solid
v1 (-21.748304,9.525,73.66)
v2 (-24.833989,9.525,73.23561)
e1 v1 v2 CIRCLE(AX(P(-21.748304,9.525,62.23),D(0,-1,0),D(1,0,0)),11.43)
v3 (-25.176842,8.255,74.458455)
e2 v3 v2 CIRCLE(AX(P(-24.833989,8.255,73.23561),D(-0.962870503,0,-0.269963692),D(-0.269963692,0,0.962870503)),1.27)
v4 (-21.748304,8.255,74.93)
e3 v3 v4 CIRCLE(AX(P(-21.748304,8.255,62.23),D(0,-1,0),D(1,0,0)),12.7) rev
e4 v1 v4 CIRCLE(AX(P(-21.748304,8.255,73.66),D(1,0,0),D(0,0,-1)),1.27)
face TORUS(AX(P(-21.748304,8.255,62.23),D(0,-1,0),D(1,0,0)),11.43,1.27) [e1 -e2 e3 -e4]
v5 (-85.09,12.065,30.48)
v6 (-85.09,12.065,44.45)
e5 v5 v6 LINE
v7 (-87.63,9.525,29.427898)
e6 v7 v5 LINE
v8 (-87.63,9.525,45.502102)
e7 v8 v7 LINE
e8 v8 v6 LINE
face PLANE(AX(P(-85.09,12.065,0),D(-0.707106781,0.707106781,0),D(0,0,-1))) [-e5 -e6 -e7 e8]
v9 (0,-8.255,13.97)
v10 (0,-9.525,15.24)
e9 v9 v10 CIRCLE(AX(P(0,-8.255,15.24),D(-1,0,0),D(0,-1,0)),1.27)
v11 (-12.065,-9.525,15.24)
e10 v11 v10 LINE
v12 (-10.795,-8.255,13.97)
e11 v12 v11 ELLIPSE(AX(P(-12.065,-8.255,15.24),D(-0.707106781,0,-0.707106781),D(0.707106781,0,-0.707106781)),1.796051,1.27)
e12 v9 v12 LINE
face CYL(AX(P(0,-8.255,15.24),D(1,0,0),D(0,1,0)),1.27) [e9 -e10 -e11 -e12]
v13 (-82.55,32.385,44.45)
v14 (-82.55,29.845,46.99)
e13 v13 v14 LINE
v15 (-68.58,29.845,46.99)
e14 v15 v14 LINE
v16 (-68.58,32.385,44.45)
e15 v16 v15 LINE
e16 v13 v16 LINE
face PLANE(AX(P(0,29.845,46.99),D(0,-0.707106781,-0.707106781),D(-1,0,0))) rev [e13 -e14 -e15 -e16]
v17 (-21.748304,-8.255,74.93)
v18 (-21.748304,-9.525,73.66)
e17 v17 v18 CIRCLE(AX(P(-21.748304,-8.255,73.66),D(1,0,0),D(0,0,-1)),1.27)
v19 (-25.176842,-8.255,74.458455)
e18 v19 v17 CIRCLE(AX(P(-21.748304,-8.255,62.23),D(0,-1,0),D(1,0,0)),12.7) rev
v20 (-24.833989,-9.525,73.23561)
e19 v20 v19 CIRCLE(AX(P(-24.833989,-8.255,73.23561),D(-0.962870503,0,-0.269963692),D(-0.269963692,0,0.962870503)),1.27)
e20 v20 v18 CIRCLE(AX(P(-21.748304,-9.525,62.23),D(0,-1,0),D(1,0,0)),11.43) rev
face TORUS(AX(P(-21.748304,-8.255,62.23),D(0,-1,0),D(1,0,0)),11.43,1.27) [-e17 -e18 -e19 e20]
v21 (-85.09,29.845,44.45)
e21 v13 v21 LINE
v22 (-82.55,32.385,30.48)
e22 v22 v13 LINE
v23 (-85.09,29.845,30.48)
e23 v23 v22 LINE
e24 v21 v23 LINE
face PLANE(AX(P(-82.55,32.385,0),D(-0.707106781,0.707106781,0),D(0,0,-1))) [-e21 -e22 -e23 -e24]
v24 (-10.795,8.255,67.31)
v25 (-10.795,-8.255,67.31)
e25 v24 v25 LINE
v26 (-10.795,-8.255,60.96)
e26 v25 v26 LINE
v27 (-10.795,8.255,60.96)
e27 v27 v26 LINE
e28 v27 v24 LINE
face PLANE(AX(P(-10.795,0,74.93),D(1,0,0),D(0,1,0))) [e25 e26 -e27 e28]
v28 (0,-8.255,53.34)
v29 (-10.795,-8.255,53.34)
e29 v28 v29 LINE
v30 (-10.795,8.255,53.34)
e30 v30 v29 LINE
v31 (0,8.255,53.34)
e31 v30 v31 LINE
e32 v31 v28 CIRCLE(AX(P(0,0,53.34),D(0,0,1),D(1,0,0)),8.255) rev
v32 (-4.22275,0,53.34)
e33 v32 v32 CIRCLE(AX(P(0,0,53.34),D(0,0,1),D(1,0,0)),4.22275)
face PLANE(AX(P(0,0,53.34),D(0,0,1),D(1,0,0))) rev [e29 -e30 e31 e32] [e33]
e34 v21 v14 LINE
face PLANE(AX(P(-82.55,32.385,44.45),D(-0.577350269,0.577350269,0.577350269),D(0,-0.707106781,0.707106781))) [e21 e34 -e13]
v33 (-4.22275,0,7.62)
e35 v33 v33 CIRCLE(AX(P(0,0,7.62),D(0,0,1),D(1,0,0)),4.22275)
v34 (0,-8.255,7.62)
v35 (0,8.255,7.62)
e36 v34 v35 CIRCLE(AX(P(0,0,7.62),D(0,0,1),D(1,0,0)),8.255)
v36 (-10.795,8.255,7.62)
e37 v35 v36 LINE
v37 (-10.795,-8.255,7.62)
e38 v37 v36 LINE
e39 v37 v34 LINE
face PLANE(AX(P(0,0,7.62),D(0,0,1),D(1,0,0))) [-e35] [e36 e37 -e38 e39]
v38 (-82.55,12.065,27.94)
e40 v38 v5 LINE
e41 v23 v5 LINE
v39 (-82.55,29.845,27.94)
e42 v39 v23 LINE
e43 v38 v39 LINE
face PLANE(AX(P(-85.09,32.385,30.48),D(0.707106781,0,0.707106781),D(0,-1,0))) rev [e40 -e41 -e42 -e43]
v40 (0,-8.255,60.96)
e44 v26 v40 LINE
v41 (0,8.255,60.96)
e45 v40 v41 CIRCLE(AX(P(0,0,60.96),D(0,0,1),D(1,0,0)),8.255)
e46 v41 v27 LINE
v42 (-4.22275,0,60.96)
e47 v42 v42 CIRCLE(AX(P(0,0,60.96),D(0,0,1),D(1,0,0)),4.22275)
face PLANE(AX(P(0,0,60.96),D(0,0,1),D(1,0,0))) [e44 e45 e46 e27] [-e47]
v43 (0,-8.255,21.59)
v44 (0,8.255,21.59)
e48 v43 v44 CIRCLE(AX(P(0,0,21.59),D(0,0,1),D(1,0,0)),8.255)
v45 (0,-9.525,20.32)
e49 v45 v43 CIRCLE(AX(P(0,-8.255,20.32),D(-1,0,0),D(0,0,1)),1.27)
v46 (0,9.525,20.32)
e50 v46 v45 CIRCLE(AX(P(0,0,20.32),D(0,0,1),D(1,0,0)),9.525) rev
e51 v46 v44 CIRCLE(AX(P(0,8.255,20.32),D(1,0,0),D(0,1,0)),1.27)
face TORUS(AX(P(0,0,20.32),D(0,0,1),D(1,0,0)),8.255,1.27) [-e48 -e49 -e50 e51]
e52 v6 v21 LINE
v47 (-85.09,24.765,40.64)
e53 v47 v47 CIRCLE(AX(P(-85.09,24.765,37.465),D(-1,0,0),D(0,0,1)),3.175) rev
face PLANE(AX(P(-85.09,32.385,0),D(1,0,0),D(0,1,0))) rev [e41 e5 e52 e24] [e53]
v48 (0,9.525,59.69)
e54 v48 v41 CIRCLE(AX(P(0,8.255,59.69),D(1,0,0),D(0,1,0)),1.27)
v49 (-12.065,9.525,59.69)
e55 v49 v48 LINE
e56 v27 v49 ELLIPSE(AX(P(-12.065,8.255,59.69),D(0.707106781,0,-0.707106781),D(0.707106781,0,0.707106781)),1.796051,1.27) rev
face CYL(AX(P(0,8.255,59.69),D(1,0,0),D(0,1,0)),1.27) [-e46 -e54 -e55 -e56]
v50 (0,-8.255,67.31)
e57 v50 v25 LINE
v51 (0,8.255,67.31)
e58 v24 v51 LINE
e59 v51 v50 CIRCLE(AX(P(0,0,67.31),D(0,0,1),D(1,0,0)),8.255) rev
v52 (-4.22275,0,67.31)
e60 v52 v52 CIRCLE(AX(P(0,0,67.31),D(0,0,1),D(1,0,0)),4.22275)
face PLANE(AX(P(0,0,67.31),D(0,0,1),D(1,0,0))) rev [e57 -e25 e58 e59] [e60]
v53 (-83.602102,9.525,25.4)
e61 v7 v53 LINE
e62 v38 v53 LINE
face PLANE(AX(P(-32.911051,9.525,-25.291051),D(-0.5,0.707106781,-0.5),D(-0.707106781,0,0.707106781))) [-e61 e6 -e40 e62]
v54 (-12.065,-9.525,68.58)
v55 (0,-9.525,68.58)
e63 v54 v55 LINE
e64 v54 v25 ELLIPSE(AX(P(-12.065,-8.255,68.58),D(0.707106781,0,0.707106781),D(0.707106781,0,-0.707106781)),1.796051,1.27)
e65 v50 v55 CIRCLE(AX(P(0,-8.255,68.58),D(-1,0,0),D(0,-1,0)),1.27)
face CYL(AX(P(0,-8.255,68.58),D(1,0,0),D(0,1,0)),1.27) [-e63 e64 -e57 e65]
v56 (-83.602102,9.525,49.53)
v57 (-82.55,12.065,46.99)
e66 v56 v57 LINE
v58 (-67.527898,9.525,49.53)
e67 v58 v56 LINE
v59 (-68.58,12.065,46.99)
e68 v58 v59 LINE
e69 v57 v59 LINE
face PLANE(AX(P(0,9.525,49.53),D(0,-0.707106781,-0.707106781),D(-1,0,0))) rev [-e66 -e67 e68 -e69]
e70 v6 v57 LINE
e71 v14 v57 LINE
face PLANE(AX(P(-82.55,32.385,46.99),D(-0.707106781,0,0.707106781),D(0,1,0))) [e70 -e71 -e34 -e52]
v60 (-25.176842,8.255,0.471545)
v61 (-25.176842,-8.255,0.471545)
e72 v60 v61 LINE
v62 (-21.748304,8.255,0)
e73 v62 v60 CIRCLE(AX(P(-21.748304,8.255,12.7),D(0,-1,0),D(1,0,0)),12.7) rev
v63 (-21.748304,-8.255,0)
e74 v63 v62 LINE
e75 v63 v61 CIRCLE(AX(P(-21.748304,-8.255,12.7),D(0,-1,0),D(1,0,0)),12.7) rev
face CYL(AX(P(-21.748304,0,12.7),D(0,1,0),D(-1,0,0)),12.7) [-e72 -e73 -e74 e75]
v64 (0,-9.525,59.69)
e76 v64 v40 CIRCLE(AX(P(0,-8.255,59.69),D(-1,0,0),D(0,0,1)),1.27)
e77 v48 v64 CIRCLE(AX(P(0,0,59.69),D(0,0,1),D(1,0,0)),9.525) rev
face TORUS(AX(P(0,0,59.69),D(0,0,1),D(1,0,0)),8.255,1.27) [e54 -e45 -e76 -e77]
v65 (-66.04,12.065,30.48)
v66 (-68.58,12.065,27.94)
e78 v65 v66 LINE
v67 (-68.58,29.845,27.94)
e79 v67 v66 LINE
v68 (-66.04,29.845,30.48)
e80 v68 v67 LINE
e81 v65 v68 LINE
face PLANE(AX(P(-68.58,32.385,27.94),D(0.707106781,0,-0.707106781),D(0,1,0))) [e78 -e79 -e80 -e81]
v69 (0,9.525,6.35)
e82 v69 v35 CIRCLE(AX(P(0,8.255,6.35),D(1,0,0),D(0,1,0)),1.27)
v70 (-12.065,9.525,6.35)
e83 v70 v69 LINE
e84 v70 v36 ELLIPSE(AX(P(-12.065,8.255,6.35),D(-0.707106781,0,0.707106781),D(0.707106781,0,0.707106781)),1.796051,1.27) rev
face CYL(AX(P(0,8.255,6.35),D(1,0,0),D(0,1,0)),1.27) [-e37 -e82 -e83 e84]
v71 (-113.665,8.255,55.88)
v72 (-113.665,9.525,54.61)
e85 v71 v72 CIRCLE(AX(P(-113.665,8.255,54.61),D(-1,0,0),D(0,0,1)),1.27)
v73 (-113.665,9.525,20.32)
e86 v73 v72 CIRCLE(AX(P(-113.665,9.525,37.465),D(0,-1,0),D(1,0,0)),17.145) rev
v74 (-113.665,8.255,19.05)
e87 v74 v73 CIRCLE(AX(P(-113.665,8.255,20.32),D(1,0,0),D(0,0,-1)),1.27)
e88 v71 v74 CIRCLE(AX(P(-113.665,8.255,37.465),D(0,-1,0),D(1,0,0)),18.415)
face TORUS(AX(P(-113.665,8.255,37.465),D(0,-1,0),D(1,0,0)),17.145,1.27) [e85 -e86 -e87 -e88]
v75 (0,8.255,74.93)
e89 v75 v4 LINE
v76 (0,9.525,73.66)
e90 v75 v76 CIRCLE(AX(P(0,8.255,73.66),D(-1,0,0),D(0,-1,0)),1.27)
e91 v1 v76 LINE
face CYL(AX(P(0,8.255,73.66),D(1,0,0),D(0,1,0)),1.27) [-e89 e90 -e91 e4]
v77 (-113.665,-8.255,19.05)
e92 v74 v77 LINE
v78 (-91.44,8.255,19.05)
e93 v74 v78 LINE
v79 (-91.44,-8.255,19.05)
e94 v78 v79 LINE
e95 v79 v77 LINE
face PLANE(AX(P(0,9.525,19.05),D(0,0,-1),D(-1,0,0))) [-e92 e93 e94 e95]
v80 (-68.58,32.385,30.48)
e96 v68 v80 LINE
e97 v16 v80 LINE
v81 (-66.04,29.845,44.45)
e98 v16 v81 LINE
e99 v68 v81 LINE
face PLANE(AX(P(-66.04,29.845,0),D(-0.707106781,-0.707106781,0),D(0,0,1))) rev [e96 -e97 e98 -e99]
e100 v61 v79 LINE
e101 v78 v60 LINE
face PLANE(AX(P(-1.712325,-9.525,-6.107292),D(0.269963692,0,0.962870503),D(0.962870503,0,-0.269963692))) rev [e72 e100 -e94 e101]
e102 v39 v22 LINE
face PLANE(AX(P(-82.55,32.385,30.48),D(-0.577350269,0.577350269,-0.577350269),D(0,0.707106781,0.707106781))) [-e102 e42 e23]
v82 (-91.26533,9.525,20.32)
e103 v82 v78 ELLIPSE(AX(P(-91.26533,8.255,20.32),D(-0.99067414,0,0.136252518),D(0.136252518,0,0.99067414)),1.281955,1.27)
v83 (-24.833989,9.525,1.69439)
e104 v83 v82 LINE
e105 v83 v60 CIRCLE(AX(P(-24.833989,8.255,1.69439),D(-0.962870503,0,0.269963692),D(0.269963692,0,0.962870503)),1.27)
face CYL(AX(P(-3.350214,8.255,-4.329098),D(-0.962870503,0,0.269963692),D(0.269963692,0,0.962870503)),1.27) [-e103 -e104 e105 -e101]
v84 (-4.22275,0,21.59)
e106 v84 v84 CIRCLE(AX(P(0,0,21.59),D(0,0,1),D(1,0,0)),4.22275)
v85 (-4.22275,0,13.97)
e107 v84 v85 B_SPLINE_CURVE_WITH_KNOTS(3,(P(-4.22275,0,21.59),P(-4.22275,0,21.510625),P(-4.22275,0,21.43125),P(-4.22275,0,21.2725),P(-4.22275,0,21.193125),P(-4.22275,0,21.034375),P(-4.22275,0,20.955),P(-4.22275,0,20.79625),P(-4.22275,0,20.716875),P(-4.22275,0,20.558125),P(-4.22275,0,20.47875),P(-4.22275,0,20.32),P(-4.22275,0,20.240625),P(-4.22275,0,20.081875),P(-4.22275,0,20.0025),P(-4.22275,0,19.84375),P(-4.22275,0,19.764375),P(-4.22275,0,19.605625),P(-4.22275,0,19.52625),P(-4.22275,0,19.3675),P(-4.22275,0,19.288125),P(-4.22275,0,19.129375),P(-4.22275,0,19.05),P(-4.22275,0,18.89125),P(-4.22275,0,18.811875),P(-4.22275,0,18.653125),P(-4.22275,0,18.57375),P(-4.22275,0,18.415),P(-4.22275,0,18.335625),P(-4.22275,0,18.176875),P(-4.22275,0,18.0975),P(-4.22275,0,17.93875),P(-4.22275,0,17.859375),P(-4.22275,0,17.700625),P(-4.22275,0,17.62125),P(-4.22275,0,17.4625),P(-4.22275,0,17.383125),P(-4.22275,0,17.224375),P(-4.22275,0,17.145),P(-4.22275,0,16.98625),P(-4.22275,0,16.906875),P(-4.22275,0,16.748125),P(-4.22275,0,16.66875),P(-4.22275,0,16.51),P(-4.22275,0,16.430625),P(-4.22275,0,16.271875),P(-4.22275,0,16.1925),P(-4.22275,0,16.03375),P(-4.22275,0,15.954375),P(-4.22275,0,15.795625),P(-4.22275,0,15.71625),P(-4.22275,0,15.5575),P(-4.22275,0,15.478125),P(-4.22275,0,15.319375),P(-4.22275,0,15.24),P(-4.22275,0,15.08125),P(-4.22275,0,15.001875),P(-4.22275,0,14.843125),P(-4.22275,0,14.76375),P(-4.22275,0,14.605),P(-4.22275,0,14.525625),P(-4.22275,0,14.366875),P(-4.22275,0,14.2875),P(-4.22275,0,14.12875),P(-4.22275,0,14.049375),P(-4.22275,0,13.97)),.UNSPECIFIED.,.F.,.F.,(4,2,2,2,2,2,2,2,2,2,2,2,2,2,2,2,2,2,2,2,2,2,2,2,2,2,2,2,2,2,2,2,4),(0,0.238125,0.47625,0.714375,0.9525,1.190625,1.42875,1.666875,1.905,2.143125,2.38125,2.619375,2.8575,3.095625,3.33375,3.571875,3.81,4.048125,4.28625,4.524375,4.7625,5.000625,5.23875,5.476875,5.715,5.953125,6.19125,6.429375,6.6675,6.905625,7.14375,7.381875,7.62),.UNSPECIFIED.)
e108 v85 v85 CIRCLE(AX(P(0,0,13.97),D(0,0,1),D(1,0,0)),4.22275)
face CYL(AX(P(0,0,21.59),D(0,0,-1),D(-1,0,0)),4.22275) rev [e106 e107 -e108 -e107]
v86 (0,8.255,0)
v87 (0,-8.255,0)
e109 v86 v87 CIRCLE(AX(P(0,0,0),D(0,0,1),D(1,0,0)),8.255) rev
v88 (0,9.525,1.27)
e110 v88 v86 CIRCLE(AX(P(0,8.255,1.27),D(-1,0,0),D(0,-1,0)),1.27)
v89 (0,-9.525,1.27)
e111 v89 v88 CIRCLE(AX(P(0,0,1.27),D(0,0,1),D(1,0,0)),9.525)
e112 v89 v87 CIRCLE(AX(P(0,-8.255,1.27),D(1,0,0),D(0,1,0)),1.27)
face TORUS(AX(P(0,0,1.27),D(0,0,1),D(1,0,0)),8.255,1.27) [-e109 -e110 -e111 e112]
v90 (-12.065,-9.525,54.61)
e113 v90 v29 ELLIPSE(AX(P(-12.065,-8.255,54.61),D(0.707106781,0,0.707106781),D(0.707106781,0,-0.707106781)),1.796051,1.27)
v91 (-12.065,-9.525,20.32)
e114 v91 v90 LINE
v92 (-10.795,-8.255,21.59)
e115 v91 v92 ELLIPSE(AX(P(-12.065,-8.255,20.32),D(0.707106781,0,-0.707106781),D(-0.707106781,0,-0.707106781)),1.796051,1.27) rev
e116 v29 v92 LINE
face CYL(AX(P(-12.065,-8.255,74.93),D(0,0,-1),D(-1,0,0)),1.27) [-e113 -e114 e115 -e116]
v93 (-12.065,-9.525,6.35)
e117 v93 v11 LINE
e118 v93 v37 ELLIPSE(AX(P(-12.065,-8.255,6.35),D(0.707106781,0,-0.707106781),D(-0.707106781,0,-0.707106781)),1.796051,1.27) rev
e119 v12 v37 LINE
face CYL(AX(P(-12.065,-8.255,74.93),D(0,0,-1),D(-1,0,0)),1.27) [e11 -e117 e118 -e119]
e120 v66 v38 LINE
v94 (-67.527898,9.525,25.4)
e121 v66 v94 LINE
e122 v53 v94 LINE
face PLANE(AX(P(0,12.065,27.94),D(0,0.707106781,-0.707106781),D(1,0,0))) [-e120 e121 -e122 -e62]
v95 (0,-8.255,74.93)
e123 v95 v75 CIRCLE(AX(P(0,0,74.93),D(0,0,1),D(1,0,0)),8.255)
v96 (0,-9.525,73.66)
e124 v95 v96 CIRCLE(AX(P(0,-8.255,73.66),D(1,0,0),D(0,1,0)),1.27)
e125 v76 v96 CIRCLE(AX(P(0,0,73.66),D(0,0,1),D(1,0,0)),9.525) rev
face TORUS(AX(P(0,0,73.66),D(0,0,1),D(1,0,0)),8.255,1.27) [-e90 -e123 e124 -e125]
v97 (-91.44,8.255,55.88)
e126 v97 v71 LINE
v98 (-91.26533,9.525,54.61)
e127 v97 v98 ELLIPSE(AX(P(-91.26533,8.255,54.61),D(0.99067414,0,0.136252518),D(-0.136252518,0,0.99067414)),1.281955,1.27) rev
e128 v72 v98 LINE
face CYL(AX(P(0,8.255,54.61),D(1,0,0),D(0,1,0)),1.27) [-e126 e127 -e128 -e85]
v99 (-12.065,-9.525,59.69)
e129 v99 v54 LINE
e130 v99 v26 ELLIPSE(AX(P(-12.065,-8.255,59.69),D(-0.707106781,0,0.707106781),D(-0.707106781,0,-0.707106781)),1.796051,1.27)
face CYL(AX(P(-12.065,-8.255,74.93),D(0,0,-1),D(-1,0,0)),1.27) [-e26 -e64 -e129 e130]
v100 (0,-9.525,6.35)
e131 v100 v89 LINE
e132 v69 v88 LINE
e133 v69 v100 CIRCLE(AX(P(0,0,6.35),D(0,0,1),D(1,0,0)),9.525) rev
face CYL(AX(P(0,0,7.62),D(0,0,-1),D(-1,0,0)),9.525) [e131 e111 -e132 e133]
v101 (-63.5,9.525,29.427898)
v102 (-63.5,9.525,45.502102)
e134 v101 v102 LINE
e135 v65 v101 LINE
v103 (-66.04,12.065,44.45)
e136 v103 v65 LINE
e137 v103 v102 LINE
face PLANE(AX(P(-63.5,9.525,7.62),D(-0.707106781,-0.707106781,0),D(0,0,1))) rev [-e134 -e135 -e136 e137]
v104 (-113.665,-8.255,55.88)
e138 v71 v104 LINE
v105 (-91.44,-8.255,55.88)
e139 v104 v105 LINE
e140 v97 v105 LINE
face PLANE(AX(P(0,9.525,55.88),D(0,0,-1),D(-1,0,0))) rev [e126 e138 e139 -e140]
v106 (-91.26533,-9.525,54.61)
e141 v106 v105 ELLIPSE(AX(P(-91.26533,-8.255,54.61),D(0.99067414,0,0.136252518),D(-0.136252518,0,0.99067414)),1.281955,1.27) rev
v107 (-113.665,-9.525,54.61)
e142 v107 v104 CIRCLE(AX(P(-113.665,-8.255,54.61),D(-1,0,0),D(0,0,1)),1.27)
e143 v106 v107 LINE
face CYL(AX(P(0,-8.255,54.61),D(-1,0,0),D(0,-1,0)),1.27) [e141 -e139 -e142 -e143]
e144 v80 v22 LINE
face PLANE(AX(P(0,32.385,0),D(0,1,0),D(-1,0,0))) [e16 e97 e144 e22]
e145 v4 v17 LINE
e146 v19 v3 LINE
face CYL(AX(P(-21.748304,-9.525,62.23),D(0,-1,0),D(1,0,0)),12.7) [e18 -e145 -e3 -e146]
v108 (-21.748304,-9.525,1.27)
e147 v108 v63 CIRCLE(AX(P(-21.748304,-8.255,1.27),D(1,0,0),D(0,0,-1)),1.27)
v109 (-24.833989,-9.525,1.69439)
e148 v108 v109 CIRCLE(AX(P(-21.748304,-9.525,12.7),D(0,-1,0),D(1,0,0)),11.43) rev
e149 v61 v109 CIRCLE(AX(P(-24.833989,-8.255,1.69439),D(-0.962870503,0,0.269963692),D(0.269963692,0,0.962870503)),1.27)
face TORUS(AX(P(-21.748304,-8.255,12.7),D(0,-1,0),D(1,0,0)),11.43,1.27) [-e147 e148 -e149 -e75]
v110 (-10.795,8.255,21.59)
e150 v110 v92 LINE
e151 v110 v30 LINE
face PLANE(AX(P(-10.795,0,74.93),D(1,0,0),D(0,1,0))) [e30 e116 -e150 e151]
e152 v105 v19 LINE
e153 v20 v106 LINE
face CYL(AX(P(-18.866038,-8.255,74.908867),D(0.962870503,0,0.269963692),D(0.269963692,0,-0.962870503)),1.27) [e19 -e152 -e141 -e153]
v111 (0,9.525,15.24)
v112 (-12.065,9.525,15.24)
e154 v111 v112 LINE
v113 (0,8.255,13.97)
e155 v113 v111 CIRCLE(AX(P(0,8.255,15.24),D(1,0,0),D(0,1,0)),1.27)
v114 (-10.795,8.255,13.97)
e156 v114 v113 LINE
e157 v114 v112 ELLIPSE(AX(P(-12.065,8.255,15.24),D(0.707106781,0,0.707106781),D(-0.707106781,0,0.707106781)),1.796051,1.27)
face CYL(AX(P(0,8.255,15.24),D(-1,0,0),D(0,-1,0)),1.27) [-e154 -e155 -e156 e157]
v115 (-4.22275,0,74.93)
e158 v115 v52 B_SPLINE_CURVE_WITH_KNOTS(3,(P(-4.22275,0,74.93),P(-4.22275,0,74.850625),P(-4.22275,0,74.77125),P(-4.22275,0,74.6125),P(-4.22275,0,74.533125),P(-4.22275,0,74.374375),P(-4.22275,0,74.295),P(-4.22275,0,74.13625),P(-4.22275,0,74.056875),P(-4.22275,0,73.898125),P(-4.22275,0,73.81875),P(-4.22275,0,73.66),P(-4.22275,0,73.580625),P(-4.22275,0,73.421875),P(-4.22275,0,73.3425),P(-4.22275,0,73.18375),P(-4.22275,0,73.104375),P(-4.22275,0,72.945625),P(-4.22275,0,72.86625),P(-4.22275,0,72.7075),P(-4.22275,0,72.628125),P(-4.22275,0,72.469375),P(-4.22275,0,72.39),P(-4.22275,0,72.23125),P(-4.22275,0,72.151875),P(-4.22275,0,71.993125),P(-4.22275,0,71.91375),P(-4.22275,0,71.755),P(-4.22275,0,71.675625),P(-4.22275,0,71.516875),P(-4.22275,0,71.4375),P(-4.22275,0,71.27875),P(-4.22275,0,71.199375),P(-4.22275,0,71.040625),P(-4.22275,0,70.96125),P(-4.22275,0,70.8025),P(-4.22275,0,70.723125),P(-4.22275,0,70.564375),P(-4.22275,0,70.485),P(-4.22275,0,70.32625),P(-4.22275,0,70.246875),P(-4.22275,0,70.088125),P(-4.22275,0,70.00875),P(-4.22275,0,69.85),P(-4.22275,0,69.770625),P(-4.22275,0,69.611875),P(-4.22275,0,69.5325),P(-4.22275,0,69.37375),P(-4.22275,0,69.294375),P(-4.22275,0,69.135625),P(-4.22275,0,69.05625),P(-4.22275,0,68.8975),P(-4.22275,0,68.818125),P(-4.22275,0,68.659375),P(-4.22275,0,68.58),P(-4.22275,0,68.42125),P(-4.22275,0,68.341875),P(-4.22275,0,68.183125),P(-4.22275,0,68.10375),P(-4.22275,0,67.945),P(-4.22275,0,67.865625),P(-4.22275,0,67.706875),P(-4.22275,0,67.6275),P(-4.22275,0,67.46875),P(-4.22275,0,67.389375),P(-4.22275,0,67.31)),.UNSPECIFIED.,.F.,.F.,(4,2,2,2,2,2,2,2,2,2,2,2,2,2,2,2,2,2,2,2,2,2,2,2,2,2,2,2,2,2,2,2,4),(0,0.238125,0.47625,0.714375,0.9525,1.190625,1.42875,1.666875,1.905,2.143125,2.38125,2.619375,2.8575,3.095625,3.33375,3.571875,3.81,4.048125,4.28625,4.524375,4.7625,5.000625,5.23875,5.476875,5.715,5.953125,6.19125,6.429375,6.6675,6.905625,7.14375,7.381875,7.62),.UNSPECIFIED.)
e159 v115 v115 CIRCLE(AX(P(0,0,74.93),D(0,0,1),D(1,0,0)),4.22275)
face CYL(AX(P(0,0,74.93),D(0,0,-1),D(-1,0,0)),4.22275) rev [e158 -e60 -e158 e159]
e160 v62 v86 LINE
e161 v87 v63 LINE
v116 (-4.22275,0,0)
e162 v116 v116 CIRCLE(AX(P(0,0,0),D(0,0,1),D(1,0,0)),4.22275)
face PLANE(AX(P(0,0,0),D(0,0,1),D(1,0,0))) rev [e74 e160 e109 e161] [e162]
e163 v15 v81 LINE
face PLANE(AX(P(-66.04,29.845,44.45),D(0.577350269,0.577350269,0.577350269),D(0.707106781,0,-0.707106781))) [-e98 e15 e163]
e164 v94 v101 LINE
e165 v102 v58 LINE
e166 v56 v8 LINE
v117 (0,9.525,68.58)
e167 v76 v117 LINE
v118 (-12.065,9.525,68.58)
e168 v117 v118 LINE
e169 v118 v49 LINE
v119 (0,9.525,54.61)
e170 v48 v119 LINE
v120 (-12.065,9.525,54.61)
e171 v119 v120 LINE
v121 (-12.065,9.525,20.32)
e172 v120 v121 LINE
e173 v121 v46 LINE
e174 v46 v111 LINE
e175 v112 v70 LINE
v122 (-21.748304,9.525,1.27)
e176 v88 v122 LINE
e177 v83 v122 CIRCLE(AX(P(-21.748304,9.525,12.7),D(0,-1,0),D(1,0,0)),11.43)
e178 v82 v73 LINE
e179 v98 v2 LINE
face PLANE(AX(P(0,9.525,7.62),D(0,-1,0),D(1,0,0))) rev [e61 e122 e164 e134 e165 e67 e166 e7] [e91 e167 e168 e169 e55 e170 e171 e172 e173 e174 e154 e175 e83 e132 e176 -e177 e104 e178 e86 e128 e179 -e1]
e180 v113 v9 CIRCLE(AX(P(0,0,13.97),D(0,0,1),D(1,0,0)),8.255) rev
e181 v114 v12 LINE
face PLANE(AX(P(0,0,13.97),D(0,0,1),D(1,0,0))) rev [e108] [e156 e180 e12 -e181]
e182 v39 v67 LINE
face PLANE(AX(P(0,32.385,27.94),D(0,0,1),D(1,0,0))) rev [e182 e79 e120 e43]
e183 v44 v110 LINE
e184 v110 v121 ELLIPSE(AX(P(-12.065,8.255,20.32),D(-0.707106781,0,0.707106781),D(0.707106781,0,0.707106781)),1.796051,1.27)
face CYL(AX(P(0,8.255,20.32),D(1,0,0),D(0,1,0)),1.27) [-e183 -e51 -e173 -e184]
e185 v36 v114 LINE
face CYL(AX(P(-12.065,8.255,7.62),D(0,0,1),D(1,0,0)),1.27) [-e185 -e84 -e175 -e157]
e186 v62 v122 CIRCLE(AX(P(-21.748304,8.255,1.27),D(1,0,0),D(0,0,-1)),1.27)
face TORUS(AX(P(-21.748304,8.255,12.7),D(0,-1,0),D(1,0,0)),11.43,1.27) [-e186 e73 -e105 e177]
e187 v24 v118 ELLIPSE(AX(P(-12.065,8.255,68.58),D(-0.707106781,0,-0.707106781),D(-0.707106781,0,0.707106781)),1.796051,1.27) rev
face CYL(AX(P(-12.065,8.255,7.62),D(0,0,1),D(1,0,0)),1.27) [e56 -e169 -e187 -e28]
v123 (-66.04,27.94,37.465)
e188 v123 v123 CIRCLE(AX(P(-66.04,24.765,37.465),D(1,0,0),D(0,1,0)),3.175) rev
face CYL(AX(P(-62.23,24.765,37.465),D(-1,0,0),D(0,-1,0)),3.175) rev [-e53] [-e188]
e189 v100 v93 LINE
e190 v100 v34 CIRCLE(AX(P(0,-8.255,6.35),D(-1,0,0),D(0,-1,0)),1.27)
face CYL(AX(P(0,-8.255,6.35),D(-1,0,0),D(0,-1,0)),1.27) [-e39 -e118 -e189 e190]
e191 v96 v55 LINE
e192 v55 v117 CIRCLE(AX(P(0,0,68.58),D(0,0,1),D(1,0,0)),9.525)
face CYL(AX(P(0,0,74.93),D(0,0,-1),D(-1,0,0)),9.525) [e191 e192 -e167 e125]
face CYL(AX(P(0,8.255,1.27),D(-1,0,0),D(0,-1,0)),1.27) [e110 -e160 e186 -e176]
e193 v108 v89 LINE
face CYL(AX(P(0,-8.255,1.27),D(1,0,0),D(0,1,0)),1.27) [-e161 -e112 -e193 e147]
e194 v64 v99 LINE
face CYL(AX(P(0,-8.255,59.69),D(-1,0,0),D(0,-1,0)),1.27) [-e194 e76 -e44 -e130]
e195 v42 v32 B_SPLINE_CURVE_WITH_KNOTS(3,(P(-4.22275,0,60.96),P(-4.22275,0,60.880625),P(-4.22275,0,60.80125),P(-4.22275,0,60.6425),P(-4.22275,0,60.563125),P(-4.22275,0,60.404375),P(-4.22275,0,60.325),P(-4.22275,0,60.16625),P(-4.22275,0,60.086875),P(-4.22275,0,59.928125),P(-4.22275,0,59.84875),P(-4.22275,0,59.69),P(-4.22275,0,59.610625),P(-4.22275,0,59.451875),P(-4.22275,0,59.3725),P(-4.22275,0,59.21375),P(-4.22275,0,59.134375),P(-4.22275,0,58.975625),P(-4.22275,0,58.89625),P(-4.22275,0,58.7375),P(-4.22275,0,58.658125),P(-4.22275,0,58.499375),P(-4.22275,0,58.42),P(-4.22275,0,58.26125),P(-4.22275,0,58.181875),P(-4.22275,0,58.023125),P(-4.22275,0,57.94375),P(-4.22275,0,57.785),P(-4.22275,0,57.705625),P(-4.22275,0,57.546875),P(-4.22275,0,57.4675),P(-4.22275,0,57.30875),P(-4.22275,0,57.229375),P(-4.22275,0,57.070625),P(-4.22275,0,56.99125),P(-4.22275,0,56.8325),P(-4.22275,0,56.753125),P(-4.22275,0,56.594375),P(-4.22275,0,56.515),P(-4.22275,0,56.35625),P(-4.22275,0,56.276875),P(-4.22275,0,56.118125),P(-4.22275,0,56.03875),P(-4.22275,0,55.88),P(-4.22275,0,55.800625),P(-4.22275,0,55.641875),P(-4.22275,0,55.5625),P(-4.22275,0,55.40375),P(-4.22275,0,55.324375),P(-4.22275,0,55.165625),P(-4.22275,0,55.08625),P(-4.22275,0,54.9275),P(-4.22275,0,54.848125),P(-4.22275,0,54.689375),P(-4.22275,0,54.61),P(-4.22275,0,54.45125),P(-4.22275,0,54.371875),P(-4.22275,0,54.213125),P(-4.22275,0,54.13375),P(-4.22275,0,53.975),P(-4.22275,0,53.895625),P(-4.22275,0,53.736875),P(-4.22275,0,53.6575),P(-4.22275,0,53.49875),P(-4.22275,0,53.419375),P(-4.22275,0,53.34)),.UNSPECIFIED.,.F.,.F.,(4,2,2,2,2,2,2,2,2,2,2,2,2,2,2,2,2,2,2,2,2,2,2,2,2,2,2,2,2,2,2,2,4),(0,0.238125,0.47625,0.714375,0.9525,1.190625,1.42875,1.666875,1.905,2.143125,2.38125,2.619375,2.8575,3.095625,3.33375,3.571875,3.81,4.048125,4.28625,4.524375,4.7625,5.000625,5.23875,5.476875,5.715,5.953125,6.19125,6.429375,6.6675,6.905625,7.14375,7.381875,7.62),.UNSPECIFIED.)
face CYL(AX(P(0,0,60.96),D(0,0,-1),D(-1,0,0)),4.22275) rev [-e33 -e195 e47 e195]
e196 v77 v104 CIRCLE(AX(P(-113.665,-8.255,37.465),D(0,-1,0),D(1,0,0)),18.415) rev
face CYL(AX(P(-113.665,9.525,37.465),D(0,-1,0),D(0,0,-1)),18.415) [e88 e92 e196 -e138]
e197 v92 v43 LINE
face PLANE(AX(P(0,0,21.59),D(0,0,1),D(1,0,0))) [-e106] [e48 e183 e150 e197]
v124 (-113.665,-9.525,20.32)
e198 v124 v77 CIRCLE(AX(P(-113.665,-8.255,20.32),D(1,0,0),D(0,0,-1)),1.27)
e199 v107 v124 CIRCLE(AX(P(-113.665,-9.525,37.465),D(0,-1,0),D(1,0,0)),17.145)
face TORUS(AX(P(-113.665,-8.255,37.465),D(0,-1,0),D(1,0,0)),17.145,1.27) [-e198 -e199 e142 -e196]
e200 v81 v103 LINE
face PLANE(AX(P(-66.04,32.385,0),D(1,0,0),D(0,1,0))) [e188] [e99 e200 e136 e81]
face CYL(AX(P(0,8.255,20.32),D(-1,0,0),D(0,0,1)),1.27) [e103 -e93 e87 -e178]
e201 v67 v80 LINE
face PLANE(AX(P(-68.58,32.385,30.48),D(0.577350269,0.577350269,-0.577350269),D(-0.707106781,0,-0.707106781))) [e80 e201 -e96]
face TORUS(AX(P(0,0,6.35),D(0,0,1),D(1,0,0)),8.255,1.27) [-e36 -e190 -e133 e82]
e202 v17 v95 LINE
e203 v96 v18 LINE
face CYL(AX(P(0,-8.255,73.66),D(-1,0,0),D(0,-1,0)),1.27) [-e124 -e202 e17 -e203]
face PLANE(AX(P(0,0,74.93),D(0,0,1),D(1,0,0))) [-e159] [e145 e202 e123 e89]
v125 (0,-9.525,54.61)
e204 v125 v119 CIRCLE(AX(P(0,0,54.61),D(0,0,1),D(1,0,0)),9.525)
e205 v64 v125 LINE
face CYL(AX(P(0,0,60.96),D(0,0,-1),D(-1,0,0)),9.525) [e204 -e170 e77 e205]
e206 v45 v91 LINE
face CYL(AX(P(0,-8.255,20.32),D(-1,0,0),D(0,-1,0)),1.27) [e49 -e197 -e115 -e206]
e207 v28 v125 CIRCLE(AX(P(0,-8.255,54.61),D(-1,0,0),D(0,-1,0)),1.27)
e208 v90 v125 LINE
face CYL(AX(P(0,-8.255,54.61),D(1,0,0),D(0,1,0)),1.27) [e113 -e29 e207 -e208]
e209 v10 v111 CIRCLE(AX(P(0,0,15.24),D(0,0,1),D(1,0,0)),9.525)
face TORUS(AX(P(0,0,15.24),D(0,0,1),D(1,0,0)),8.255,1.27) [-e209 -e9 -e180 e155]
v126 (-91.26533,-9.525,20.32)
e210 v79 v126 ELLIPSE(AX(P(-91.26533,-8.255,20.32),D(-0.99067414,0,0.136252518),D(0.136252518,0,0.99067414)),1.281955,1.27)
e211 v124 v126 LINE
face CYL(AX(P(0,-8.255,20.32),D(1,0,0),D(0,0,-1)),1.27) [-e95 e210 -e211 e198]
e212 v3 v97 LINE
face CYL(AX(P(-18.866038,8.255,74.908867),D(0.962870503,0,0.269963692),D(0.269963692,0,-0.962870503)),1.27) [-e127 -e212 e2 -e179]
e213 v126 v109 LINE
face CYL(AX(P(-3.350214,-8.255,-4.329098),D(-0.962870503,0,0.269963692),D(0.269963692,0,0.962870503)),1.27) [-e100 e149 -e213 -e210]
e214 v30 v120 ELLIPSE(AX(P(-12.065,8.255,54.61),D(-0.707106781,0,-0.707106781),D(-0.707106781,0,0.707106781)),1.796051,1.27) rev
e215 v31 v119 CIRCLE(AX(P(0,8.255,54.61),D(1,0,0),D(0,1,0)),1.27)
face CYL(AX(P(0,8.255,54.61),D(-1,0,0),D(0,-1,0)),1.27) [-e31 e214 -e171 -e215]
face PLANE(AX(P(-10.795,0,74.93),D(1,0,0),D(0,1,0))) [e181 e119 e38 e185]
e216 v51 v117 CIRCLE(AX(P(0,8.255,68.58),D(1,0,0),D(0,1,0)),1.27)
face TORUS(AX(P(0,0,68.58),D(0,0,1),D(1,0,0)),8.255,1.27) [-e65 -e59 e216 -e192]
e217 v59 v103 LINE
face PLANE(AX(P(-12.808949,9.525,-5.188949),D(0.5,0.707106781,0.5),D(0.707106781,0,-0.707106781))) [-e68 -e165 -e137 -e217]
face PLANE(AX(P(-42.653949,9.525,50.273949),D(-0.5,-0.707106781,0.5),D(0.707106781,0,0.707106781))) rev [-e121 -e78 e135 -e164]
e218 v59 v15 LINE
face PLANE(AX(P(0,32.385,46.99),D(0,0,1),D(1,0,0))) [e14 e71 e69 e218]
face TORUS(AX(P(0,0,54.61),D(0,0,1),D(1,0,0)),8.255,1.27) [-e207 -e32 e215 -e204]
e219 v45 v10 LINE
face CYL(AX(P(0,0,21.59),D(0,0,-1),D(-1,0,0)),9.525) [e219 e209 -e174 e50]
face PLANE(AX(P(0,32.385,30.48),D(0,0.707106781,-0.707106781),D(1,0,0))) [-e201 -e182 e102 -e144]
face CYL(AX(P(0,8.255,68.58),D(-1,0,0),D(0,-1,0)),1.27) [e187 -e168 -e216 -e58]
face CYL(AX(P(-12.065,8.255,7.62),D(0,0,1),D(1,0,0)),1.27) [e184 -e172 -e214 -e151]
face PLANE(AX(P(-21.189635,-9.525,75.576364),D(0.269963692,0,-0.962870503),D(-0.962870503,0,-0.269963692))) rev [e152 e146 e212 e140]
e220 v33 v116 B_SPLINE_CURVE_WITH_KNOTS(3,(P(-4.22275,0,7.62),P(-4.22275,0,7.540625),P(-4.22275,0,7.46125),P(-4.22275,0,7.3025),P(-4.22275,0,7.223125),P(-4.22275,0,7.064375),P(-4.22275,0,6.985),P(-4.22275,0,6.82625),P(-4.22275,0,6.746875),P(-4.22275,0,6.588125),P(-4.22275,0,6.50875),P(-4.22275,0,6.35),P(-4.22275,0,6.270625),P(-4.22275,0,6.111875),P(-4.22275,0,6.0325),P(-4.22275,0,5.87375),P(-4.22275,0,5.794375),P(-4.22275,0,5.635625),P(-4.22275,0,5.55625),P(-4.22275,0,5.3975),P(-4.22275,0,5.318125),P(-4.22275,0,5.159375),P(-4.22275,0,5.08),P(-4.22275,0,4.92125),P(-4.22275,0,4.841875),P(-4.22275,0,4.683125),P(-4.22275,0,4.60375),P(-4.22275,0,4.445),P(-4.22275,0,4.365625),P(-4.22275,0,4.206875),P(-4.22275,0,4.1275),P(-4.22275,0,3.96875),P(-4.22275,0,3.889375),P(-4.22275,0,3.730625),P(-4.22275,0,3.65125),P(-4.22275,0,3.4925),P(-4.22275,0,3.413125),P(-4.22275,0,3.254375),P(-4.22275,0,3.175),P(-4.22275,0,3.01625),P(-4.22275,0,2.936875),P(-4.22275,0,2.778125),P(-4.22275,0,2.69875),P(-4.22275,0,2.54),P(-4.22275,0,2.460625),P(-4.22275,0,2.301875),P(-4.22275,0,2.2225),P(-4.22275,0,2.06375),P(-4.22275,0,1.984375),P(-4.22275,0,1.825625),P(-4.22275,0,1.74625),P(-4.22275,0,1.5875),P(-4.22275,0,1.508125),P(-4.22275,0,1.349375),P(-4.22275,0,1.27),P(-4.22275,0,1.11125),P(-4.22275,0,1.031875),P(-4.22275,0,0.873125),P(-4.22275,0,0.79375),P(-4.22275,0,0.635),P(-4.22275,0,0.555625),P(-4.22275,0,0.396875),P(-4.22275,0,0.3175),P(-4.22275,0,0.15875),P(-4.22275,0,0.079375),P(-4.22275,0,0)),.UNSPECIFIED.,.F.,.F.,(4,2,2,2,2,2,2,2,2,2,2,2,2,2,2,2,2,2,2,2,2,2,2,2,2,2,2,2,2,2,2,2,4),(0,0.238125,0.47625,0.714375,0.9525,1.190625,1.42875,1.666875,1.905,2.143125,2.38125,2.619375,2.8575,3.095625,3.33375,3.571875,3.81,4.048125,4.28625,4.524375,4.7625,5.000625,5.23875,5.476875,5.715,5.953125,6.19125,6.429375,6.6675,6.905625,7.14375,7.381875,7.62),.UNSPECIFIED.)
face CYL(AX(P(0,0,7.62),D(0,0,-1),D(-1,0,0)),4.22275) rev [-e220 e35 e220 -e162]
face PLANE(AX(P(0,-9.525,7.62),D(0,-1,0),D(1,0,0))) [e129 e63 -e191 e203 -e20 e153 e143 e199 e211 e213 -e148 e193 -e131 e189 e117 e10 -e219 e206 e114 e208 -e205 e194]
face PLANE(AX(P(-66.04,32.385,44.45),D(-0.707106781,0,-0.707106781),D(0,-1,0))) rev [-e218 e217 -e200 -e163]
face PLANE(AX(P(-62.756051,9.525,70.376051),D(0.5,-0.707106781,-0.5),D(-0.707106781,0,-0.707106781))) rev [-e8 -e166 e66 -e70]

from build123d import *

# Parameters (mm, degrees)
SKETCH2_R                      = 4.22275
INITIAL_GROOVE_DEPTH           = 7.62
GROOVE_LINEAR_PATTERN_COUNT    = 2
GROOVE_LINEAR_PATTERN_PITCH    = 13.97
LPATTERN2_COUNT                = 2
LPATTERN2_PITCH                = 39.37
LPATTERN3_COUNT                = 2
LPATTERN3_PITCH                = 13.97
SKETCH2_5_W                    = 30.48
SKETCH2_5_H                    = 9.525
MAIN_BODY_EXTRUDE_DEPTH        = 74.93
BOSS_EXTRUDE1_DEPTH            = 9.525
BOSS_EXTRUDE1_DEPTH_BACK       = 9.525
SKETCH7_W                      = 19.05
SKETCH7_H                      = 19.05
ANKLE_CONNECTION_EXTRUDE_DEPTH = 22.86
SKETCH8_R                      = 3.175
PINHOLE_2_DEPTH                = 22.86
CUT_EXTRUDE1_DEPTH             = 154.565005454
CUT_EXTRUDE1_DEPTH_BACK        = 154.565005454
FILLET6_R                      = 1.27
FILLET1_R                      = 1.27
CHAMFER2_SIZE                  = 2.54
FILLET8_R                      = 12.7
CHAMFER3_SIZE                  = 2.54


with BuildPart() as part:
    # Sketch2 → Initial Groove (new body)
    with BuildSketch(Plane.XY):
        with BuildLine():
            Line((-41.275, -9.525), (0, -9.525))
            ThreePointArc((0, -9.525), (9.525, 0), (0, 9.525))
            Line((0, 9.525), (-41.275, 9.525))
            Line((-41.275, 9.525), (-41.275, -9.525))
        make_face()
        with Locations(Location((0, 0, 0), (0, 0, 180))):
            Circle(SKETCH2_R, mode=Mode.SUBTRACT)
    extrude(amount=INITIAL_GROOVE_DEPTH)


with BuildPart() as groove_linear_pattern_1:
    # Groove Linear Pattern: pattern copy
    add(part.part.moved(Location(Vector(0, 0, 1) * (1 * GROOVE_LINEAR_PATTERN_PITCH))))


with BuildPart() as lpattern2_1:
    # LPattern2: pattern copy
    add(groove_linear_pattern_1.part.moved(Location(Vector(0, 0, 1) * (1 * LPATTERN2_PITCH))))


with BuildPart() as lpattern3_1:
    # LPattern3: pattern copy
    add(lpattern2_1.part.moved(Location(Vector(0, 0, 1) * (1 * LPATTERN3_PITCH))))


with BuildPart() as part_1:
    add(part.part)

    add(groove_linear_pattern_1.part)  # Main Body Extrude merges Groove Linear Pattern_1

    add(lpattern2_1.part)  # Main Body Extrude merges LPattern2_1

    add(lpattern3_1.part)  # Main Body Extrude merges LPattern3_1
    # Sketch2<5> → Main Body Extrude (add)
    with BuildSketch(Plane.XY):
        Polygon((-91.44, -9.525), (-41.275, -9.525), (-41.275, 0), (-41.275, 9.525), (-91.44, 9.525), align=None)
        with Locations((-26.035, -4.7625)):
            Rectangle(SKETCH2_5_W, SKETCH2_5_H)
        with Locations((-26.035, 4.7625)):
            Rectangle(SKETCH2_5_W, SKETCH2_5_H)
    extrude(amount=MAIN_BODY_EXTRUDE_DEPTH)

    # Sketch10 → Boss-Extrude1 (add, two sides: drawn at the far end of the back side and taken through both)
    with BuildSketch(Plane(origin=(0, 0, 0), x_dir=(1, 0, 0), z_dir=(0, 1, 0)).offset(-BOSS_EXTRUDE1_DEPTH_BACK)):
        with BuildLine():
            Line((-91.44, -55.88), (-91.44, -19.05))
            Line((-91.44, -19.05), (-113.665, -19.05))
            ThreePointArc((-113.665, -19.05), (-132.08, -37.465), (-113.665, -55.88))
            Line((-113.665, -55.88), (-91.44, -55.88))
        make_face()
    extrude(amount=BOSS_EXTRUDE1_DEPTH + BOSS_EXTRUDE1_DEPTH_BACK)

    # Sketch7 → Ankle Connection Extrude (add)
    with BuildSketch(Plane(origin=(0, 9.525, 0), x_dir=(1, 0, 0), z_dir=(0, 1, 0))):
        with Locations((-75.565, -37.465)):
            Rectangle(SKETCH7_W, SKETCH7_H)
    extrude(amount=ANKLE_CONNECTION_EXTRUDE_DEPTH)

    # Sketch8 → Pinhole 2 (cut)
    with BuildSketch(Plane(origin=(-85.09, 0, -38.1), x_dir=(0, 0, -1), z_dir=(1, 0, 0))):
        with Locations(Location((-75.565, 24.765, 0), (0, 0, 180))):
            Circle(SKETCH8_R)
    extrude(amount=PINHOLE_2_DEPTH, mode=Mode.SUBTRACT)

    # Sketch13 → Cut-Extrude1 (cut, two sides: drawn at the far end of the back side and taken through both)
    with BuildSketch(Plane(origin=(0, 9.525, 0), x_dir=(1, 0, 0), z_dir=(0, 1, 0)).offset(-CUT_EXTRUDE1_DEPTH_BACK)):
        Polygon((-91.44, -74.93), (-23.495, -74.93), (-91.44, -55.88), align=None)
        Polygon((-91.44, 0), (-91.44, -19.05), (-23.495, 0), align=None)
    extrude(amount=CUT_EXTRUDE1_DEPTH + CUT_EXTRUDE1_DEPTH_BACK, mode=Mode.SUBTRACT)

    # Fillet6
    fillet6_edges = [part_1.edges().sort_by_distance(p)[0] for p in [
        (-102.5525, 9.525, 19.05),
        (-132.08, -9.525, 37.465),
        (-102.5525, -9.525, 55.88),
        (-132.08, 9.525, 37.465),
        (-102.5525, 9.525, 55.88),
        (-102.5525, -9.525, 19.05),
    ]]
    fillet(fillet6_edges, radius=FILLET6_R)

    # Fillet1
    fillet1_edges = [part_1.edges().sort_by_distance(p)[0] for p in [
        (9.525, 0, 7.62),
        (-59.732333333, 9.525, 64.77),
        (-59.732333333, -9.525, 64.77),
        (-59.732333333, 9.525, 10.16),
        (-59.732333333, -9.525, 10.16),
        (-5.3975, 9.525, 7.62),
        (-11.7475, -9.525, 74.93),
        (-11.7475, 9.525, 74.93),
        (-10.795, -9.525, 10.795),
        (-10.795, 9.525, 10.795),
        (-5.3975, -9.525, 21.59),
        (9.525, 0, 13.97),
        (-5.3975, 9.525, 13.97),
        (-5.3975, 9.525, 21.59),
        (9.525, 0, 21.59),
        (-5.3975, -9.525, 13.97),
        (-5.3975, -9.525, 7.62),
        (-10.795, 9.525, 37.465),
        (-10.795, -9.525, 37.465),
        (-5.3975, -9.525, 60.96),
        (9.525, 0, 53.34),
        (-5.3975, 9.525, 53.34),
        (-5.3975, 9.525, 60.96),
        (9.525, 0, 60.96),
        (-5.3975, -9.525, 53.34),
        (-11.7475, 9.525, 0),
        (-10.795, 9.525, 64.135),
        (-10.795, -9.525, 64.135),
        (9.525, 0, 67.31),
        (9.525, 0, 0),
        (-5.3975, 9.525, 67.31),
        (9.525, 0, 74.93),
        (-5.3975, -9.525, 67.31),
        (-11.7475, -9.525, 0),
    ]]
    fillet(fillet1_edges, radius=FILLET1_R)

    # Chamfer2
    chamfer2_edges = [part_1.edges().sort_by_distance(p)[0] for p in [
        (-66.04, 20.955, 27.94),
        (-85.09, 20.955, 27.94),
        (-75.565, 32.385, 46.99),
        (-85.09, 20.955, 46.99),
        (-66.04, 32.385, 37.465),
        (-66.04, 20.955, 46.99),
        (-75.565, 32.385, 27.94),
        (-85.09, 32.385, 37.465),
    ]]
    chamfer(chamfer2_edges, length=CHAMFER2_SIZE)

    # Fillet8
    # the kernel refuses this fillet: 12.7 mm, written as the material it takes off along each edge
    with BuildSketch(Plane(origin=(-21.748303574, -9.525, 62.23), x_dir=(0, 0, 1), z_dir=(1, 0, 0))) as fillet8_piece_1:
        with BuildLine():
            CenterArc((11.43, -1.27), 1.27, 0, 90)
            Line((12.7, -1.27), (12.7, 0))
            Line((12.7, 0), (11.43, 0))
        make_face()
    revolve(axis=Axis((-21.748303574, -9.525, 62.23), (0, -1, 0)), revolution_arc=15.662106345, mode=Mode.SUBTRACT)
    with BuildSketch(Plane(origin=(-21.748303574, 9.525, 62.23), x_dir=(-0.269963692324909, 0, 0.96287050262551), z_dir=(-0.96287050262551, 0, -0.269963692324909))) as fillet8_piece_2:
        with BuildLine():
            CenterArc((11.43, -1.27), 1.27, 0, 90)
            Line((12.7, -1.27), (12.7, 0))
            Line((12.7, 0), (11.43, 0))
        make_face()
    revolve(axis=Axis((-21.748303574, 9.525, 62.23), (0, 1, 0)), revolution_arc=15.662106345, mode=Mode.SUBTRACT)
    with BuildSketch(Plane(origin=(-21.748303574, -9.525, 12.7), x_dir=(-0.2699636923249093, 0, -0.9628705026255098), z_dir=(-0.9628705026255098, 0, 0.2699636923249093))) as fillet8_piece_3:
        with BuildLine():
            CenterArc((11.43, -1.27), 1.27, 0, 90)
            Line((12.7, -1.27), (12.7, 0))
            Line((12.7, 0), (11.43, 0))
        make_face()
    revolve(axis=Axis((-21.748303574, -9.525, 12.7), (0, -1, 0)), revolution_arc=15.662106345, mode=Mode.SUBTRACT)
    with BuildSketch(Plane(origin=(-21.748303574, 9.525, 12.7), x_dir=(0, 0, -1), z_dir=(1, 0, 0))) as fillet8_piece_4:
        with BuildLine():
            CenterArc((11.43, -1.27), 1.27, 0, 90)
            Line((12.7, -1.27), (12.7, 0))
            Line((12.7, 0), (11.43, 0))
        make_face()
    revolve(axis=Axis((-21.748303574, 9.525, 12.7), (0, 1, 0)), revolution_arc=15.662106345, mode=Mode.SUBTRACT)
    with BuildSketch(Plane(origin=(-23.495, -9.525, 74.93), x_dir=(1, 0, 0), z_dir=(0, 1, 0))) as fillet8_piece_5:
        with BuildLine():
            CenterArc((FILLET8_R * 0.137535151689, FILLET8_R), FILLET8_R, 254.337893655, 15.662106345)
            Line((-FILLET8_R * 0.132428540636, FILLET8_R * 0.0371294973745), (0, 0))
            Line((0, 0), (FILLET8_R * 0.137535151689, 0))
        make_face()
    extrude(amount=19.05, mode=Mode.SUBTRACT)
    with BuildSketch(Plane(origin=(-23.495, 9.525, 0), x_dir=(-0.96287050262551, 0, 0.26996369232490863), z_dir=(0, -1, 0))) as fillet8_piece_6:
        with BuildLine():
            CenterArc((FILLET8_R * 0.137535151689, -FILLET8_R), FILLET8_R, 90, 15.662106345)
            Line((-FILLET8_R * 0.132428540636, -FILLET8_R * 0.0371294973745), (0, 0))
            Line((0, 0), (FILLET8_R * 0.137535151689, 0))
        make_face()
    extrude(amount=19.05, mode=Mode.SUBTRACT)

    # Chamfer3
    chamfer3_edges = [part_1.edges().sort_by_distance(p)[0] for p in [
        (-66.04, 9.525, 37.465),
        (-75.565, 9.525, 27.94),
        (-85.09, 9.525, 37.465),
        (-75.565, 9.525, 46.99),
        (-67.31, 9.525, 29.21),
        (-83.82, 9.525, 29.21),
        (-83.82, 9.525, 45.72),
        (-67.31, 9.525, 45.72),
    ]]
    chamfer(chamfer3_edges, length=CHAMFER3_SIZE)


solid = part_1.part
